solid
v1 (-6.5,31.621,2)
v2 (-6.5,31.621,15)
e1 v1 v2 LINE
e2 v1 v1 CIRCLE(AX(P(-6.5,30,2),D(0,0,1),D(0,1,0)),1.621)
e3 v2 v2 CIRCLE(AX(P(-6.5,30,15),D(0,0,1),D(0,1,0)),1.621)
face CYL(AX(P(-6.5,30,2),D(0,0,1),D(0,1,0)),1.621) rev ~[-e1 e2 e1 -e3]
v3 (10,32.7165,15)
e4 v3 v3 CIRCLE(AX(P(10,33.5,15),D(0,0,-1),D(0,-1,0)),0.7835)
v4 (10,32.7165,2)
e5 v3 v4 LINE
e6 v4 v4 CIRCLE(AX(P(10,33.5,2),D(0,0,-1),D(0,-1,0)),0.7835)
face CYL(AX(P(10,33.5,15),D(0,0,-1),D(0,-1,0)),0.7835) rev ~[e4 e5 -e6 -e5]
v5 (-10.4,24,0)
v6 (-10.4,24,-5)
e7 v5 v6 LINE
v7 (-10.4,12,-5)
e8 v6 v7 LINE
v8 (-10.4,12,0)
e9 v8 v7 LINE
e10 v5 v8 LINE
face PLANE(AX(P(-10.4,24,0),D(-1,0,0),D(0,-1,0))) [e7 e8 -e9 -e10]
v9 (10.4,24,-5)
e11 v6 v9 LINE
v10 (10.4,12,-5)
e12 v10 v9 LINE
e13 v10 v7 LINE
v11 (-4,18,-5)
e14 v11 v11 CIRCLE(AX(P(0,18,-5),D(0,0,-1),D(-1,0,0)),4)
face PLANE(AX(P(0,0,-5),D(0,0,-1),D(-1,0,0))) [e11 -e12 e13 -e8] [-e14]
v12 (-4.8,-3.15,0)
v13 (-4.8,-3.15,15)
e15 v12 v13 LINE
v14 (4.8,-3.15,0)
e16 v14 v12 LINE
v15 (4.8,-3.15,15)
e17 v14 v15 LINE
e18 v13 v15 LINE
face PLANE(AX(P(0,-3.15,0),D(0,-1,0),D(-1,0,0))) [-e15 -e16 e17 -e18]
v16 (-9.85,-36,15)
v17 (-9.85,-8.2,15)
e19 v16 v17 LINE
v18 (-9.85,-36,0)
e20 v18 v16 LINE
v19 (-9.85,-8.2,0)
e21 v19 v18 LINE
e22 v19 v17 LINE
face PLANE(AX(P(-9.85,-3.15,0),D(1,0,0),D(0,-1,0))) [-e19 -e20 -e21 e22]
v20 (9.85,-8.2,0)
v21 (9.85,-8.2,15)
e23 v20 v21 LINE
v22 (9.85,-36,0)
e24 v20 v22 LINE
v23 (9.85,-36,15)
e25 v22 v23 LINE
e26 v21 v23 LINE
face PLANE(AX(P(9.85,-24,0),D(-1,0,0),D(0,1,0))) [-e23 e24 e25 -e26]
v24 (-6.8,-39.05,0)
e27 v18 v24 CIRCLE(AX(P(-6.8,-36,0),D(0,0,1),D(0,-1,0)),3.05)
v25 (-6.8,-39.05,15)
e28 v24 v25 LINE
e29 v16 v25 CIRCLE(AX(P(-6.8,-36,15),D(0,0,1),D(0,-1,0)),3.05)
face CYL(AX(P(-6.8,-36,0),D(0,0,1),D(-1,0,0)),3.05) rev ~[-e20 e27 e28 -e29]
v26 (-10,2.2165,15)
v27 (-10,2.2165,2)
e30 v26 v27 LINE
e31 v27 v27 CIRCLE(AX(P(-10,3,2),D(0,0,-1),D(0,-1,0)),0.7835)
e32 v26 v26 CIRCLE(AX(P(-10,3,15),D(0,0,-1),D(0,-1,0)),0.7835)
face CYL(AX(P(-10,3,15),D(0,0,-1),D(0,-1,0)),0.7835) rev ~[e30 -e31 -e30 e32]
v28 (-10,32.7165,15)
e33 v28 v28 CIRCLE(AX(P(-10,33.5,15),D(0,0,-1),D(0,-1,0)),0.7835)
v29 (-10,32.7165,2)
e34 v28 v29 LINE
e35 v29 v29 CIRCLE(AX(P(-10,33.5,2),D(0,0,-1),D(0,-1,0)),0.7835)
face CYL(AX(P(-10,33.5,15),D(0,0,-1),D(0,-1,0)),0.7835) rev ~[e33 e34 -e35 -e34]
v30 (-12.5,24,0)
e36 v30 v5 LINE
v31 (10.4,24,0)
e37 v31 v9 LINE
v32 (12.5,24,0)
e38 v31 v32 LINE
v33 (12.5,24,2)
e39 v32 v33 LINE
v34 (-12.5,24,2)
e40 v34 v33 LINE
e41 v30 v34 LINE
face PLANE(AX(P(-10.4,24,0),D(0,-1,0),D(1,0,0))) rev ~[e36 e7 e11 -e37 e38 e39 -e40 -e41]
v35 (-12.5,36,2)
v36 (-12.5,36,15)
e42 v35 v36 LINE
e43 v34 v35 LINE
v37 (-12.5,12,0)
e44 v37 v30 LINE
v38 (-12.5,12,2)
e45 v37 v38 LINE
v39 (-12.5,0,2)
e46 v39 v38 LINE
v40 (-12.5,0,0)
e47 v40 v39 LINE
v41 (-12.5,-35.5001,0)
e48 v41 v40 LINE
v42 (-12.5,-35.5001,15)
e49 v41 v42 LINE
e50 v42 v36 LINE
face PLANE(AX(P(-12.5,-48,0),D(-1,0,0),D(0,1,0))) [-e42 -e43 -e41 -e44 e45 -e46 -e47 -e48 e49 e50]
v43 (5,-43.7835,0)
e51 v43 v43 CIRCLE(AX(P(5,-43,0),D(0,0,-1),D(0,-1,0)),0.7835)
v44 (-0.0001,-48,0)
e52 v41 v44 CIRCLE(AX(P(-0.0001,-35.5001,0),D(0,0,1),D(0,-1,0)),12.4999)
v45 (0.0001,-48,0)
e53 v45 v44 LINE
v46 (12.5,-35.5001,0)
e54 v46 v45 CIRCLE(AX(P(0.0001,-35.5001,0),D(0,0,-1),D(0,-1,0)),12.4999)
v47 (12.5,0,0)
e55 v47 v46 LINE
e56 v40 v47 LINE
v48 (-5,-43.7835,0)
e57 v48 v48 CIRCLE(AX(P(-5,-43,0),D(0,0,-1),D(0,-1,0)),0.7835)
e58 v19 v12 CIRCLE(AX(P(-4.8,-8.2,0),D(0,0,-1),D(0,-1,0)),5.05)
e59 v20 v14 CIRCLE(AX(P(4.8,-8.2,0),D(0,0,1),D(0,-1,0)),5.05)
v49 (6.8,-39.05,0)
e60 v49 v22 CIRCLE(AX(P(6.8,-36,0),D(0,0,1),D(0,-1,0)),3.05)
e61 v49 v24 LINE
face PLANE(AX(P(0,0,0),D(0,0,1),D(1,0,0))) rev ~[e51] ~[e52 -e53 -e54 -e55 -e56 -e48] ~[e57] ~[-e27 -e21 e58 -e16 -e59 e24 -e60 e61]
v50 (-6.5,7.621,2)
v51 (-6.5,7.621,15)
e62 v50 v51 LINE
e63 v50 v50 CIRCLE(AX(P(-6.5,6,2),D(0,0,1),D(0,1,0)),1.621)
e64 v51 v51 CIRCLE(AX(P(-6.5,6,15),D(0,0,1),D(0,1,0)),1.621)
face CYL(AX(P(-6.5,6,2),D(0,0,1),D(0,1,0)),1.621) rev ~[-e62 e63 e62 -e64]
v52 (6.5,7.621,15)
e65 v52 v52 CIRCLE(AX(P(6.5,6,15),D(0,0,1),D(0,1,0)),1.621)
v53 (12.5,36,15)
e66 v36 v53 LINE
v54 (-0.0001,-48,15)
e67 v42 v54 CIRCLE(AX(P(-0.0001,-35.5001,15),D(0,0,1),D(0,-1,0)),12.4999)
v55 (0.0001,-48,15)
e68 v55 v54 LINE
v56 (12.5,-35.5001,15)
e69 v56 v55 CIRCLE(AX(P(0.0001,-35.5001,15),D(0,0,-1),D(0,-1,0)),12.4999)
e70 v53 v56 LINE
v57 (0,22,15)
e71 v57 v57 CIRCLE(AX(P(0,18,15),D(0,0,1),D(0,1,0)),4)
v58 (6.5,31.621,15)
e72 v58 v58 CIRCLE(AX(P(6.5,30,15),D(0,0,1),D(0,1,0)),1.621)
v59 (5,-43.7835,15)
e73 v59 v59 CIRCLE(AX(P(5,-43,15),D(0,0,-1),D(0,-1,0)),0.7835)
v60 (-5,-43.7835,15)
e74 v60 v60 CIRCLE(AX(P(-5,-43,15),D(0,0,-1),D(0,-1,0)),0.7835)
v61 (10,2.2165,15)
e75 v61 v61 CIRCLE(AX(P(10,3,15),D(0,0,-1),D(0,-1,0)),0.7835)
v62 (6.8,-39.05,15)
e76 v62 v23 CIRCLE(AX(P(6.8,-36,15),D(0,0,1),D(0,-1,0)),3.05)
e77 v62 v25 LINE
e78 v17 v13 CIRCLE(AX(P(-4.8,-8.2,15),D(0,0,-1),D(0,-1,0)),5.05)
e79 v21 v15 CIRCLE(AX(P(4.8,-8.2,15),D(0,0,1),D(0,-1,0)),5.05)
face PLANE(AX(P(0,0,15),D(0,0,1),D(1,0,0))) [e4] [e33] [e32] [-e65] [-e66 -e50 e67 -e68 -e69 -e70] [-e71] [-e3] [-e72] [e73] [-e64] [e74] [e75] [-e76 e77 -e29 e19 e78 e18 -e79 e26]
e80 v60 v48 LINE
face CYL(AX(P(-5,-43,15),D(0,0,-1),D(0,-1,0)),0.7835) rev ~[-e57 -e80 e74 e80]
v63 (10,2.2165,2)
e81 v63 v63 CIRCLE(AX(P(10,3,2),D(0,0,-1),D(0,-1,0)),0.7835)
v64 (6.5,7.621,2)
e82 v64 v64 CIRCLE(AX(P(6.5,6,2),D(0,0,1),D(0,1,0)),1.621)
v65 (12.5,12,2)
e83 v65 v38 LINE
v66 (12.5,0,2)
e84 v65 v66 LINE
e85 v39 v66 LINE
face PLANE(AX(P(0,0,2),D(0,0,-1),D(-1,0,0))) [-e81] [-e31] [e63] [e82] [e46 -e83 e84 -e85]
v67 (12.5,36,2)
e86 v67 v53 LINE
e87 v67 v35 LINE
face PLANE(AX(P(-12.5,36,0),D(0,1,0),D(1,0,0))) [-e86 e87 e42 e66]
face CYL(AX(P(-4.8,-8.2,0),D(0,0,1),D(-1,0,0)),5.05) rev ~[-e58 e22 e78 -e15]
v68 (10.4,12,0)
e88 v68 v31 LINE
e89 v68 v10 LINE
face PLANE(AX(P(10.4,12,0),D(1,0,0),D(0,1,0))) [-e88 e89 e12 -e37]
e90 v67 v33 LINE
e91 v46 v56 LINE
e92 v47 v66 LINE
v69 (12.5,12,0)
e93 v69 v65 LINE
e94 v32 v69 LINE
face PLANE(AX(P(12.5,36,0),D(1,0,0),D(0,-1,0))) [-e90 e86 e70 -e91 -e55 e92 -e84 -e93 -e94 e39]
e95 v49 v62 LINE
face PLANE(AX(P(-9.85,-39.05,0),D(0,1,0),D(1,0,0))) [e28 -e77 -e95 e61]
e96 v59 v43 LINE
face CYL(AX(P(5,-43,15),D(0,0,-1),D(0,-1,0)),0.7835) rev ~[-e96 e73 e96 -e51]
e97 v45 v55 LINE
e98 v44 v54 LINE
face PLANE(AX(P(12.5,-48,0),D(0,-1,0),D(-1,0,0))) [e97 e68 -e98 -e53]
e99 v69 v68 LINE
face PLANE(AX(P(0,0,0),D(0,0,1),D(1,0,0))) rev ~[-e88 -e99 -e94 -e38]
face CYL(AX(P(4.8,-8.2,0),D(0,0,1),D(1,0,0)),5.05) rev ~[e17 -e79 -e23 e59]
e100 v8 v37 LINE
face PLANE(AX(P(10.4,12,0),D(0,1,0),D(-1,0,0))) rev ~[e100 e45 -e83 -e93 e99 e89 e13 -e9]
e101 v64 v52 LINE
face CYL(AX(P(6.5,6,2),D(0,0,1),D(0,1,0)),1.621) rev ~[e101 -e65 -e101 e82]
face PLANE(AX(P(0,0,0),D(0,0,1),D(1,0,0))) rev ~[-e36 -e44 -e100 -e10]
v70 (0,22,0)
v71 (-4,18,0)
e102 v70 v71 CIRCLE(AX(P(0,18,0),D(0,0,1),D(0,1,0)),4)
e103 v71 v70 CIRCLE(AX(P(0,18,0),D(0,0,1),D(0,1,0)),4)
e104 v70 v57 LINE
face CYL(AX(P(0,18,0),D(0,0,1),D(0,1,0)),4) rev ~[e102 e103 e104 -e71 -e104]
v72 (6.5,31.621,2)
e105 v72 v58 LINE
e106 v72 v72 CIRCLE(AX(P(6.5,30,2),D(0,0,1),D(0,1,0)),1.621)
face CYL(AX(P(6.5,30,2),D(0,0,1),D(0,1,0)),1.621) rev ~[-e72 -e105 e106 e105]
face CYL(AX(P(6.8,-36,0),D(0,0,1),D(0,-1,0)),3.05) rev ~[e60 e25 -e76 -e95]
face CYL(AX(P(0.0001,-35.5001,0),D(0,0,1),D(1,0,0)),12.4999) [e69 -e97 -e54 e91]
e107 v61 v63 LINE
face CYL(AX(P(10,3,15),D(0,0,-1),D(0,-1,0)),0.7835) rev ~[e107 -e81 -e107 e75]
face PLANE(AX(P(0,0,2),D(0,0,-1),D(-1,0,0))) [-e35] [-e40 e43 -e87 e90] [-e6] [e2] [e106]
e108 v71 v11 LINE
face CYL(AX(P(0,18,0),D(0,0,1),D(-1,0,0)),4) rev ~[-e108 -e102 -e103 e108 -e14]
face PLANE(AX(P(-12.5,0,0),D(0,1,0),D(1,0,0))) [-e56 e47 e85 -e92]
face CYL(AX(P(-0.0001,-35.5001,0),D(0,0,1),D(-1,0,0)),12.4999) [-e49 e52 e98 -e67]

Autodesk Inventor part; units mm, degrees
ref_plane "YZ Plane" through (0, 0, 0) normal (1, 0, 0) x (0, 1, 0)
ref_plane "XZ Plane" through (0, 0, 0) normal (0, 1, 0) x (-1, 0, 0)
ref_plane "XY Plane" through (0, 0, 0) normal (0, 0, 1) x (1, 0, 0)
sketch "スケッチ1" plane through (0, 0, 0) normal (0, 0, 1) x (1, 0, 0)
  line L0 (-12.5, 36) -> (12.5, 36)
  line L1 (12.5, 36) -> (12.5, -48)
  line L2 (12.5, -48) -> (-12.5, -48)
  line L3 (-12.5, -48) -> (-12.5, 36)
  point P0 (0, 0)
  dimension "d0" = 36
  dimension "d1" = 25
  dimension "d2" = 12.5
  dimension "d3" = 48
extrude "押し出し1" add sketch "スケッチ1" along normal blind 15
sketch "スケッチ2" plane through (0, 0, 0) normal (0, 0, -1) x (-1, 0, 0)
  line L0 (-12.5, 36) -> (-12.5, -48) projected
  line L1 (12.5, -48) -> (12.5, 36) projected
  line L2 (-12.5, 36) -> (12.5, 36)
  line L3 (12.5, 36) -> (12.5, 24)
  line L4 (12.5, 24) -> (-12.5, 24)
  line L5 (-12.5, 24) -> (-12.5, 36)
  line L6 (12.5, 0) -> (-12.5, 0)
  line L7 (-12.5, 0) -> (-12.5, 12)
  line L8 (-12.5, 12) -> (12.5, 12)
  line L9 (12.5, 12) -> (12.5, 0)
  point P0 (0, 0)
  dimension "d6" = 12
  dimension "d42" = 12
  dimension "d66" = 12
extrude "押し出し2" cut sketch "スケッチ2" against normal blind 2 contours L2 L1 L4 L0 | L8 L1 L6 L0
sketch "スケッチ3" plane through (0, 0, 2) normal (0, 0, -1) x (-1, 0, 0)
  line L0 (12.5, 36) -> (12.5, 24) projected
  line L1 (-12.5, 36) -> (12.5, 36) projected
  line L2 (-12.5, 24) -> (-12.5, 36) projected
  point P0 (0, 0)
  point P1 (-6.5, 30)
  point P2 (6.5, 30)
  point P3 (12.5, 0)
  point P4 (-12.5, 0)
  dimension "d10" = 6
  dimension "d11" = 6
  dimension "d12" = 6
  dimension "d13" = 6
hole "Hole1" at (6.5, 30, 2) at (-6.5, 30, 2) direction (0, 0, 1) diameter 3.242 end through all thread size "M4x0.7" class "6H" standard "ISO Metric profile"
sketch "スケッチ6" plane through (0, 0, 2) normal (0, 0, -1) x (-1, 0, 0)
  line L0 (-12.5, 0) -> (12.5, 0) projected
  line L1 (12.5, 12) -> (12.5, 0) projected
  line L2 (-12.5, 0) -> (-12.5, 12) projected
  point P0 (0, 0)
  point P1 (-6.5, 6)
  point P2 (6.5, 6)
  dimension "d43" = 6
  dimension "d44" = 6
  dimension "d45" = 6
  dimension "d46" = 6
hole "Hole4" at (6.5, 6, 2) at (-6.5, 6, 2) direction (0, 0, 1) diameter 3.242 end through all thread size "M4x0.7" class "6H" standard "ANSI Metric M Profile"
sketch "スケッチ7" plane through (0, 0, 0) normal (0, 0, -1) x (-1, 0, 0)
  line L0 (12.5, 24) -> (-12.5, 24) projected
  line L1 (12.5, 12) -> (12.5, 24) projected
  point P0 (0, 0)
  point P1 (0, 18)
  dimension "d54" = 6
  dimension "d55" = 12.5
hole "Hole5" at (0, 18, 0) direction (0, 0, 1) diameter 8 end through all
sketch "スケッチ8" plane through (0, 0, 0) normal (0, 0, -1) x (-1, 0, 0)
  line L0 (12.5, 0) -> (-12.5, 0) projected
  line L1 (-12.5, 0) -> (-12.5, -48) projected
  line L2 (-12.5, -48) -> (12.5, -48) projected
  line L3 (12.5, -48) -> (12.5, 0) projected
  line L4 (0, 0) -> (0, -48)
  line L5 (12.5, -24) -> (-12.5, -24)
  line L6 (-9.85, -3.15) -> (9.85, -3.15)
  line L7 (9.85, -3.15) -> (9.85, -39.05)
  line L8 (9.85, -39.05) -> (-9.85, -39.05)
  line L9 (-9.85, -39.05) -> (-9.85, -3.15)
  dimension "d63" = 19.7
  dimension "d64" = 19.7
  dimension "d65" = 35.9
  dimension "d68" = 3.15
extrude "押し出し3" cut sketch "スケッチ8" against normal through all contours L6 L7 L5 L4 | L4 L5 L9 L6 | L7 L8 L4 L5 | L4 L8 L9 L5
fillet "フィレット2" radius 5.05 2 edges at (9.85, -3.15, 7.5) (-9.85, -3.15, 7.5)
fillet "フィレット3" radius 3.05 2 edges at (9.85, -39.05, 7.5) (-9.85, -39.05, 7.5)
fillet "フィレット4" radius 12.5 2 edges at (12.5, -48, 7.5) (-12.5, -48, 7.5)
sketch "スケッチ13" plane through (0, 0, 15) normal (0, 0, 1) x (1, 0, 0)
  arc A0 (-12.5, -35.5) -> (12.5, -35.5) centre (0, -35.5) ccw projected
  line L0 (12.5, 36) -> (12.5, -35.5) projected
  line L1 (-12.5, 36) -> (12.5, 36) projected
  line L2 (-12.5, -35.5) -> (-12.5, 36) projected
  circle A1 centre (-6.5, 6) radius 1.621 projected
  circle A2 centre (6.5, 6) radius 1.621 projected
  point P0 (0, 0)
  point P1 (-10, 33.5)
  point P2 (10, 33.5)
  point P3 (-10, 3)
  point P4 (10, 3)
  point P5 (-5, -43)
  point P6 (5, -43)
  dimension "d106" = 2.5
  dimension "d107" = 2.5
  dimension "d108" = 2.5
  dimension "d109" = 2.5
  dimension "d110" = 2.5
  dimension "d111" = 2.5
  dimension "d112" = 3
  dimension "d113" = 3
  dimension "d114" = 5
  dimension "d115" = 5
  dimension "d125" = 79
  dimension "d126" = 79
hole "Hole8" at (-10, 33.5, 15) at (10, 33.5, 15) at (-10, 3, 15) at (10, 3, 15) at (-5, -43, 15) at (5, -43, 15) direction (0, 0, -1) diameter 1.567 end through all thread size "M2x0.4" class "6H" standard "ISO Metric profile"
sketch "スケッチ14" plane through (0, 0, 0) normal (0, 0, -1) x (-1, 0, 0)
  circle A0 centre (0, 18) radius 4 projected
  line L0 (12.5, 24) -> (-12.5, 24) projected
  line L1 (-12.5, 24) -> (-12.5, 12) projected
  line L2 (-12.5, 12) -> (12.5, 12) projected
  line L3 (12.5, 12) -> (12.5, 24) projected
  line L4 (-10.4, 24) -> (10.4, 24)
  line L5 (10.4, 24) -> (10.4, 12)
  line L6 (10.4, 12) -> (-10.4, 12)
  line L7 (-10.4, 12) -> (-10.4, 24)
  point P0 (0, 0)
  dimension "d127" = 2.1
  dimension "d128" = 2.1
extrude "押し出し4" add sketch "スケッチ14" along normal blind 5 contours L5 L2 L7 L0
equation "\"d2\" = 0.5 * d1"
equation "\"d42\" = d6"
equation "\"d66\" = d42"
equation "\"d10\" = d12"
equation "\"d11\" = d10"
equation "\"d13\" = d12"
equation "\"d44\" = d43"
equation "\"d45\" = d43"
equation "\"d46\" = d43"
equation "\"d64\" = d63"
equation "\"d107\" = d106"
equation "\"d108\" = d106"
equation "\"d109\" = d106"
equation "\"d110\" = d106"
equation "\"d111\" = d106"
equation "\"d115\" = d114"
equation "\"d126\" = d125"
equation "\"d128\" = d127"
properties part number "JointC3'_2nd" material "ポリプロピレン"
